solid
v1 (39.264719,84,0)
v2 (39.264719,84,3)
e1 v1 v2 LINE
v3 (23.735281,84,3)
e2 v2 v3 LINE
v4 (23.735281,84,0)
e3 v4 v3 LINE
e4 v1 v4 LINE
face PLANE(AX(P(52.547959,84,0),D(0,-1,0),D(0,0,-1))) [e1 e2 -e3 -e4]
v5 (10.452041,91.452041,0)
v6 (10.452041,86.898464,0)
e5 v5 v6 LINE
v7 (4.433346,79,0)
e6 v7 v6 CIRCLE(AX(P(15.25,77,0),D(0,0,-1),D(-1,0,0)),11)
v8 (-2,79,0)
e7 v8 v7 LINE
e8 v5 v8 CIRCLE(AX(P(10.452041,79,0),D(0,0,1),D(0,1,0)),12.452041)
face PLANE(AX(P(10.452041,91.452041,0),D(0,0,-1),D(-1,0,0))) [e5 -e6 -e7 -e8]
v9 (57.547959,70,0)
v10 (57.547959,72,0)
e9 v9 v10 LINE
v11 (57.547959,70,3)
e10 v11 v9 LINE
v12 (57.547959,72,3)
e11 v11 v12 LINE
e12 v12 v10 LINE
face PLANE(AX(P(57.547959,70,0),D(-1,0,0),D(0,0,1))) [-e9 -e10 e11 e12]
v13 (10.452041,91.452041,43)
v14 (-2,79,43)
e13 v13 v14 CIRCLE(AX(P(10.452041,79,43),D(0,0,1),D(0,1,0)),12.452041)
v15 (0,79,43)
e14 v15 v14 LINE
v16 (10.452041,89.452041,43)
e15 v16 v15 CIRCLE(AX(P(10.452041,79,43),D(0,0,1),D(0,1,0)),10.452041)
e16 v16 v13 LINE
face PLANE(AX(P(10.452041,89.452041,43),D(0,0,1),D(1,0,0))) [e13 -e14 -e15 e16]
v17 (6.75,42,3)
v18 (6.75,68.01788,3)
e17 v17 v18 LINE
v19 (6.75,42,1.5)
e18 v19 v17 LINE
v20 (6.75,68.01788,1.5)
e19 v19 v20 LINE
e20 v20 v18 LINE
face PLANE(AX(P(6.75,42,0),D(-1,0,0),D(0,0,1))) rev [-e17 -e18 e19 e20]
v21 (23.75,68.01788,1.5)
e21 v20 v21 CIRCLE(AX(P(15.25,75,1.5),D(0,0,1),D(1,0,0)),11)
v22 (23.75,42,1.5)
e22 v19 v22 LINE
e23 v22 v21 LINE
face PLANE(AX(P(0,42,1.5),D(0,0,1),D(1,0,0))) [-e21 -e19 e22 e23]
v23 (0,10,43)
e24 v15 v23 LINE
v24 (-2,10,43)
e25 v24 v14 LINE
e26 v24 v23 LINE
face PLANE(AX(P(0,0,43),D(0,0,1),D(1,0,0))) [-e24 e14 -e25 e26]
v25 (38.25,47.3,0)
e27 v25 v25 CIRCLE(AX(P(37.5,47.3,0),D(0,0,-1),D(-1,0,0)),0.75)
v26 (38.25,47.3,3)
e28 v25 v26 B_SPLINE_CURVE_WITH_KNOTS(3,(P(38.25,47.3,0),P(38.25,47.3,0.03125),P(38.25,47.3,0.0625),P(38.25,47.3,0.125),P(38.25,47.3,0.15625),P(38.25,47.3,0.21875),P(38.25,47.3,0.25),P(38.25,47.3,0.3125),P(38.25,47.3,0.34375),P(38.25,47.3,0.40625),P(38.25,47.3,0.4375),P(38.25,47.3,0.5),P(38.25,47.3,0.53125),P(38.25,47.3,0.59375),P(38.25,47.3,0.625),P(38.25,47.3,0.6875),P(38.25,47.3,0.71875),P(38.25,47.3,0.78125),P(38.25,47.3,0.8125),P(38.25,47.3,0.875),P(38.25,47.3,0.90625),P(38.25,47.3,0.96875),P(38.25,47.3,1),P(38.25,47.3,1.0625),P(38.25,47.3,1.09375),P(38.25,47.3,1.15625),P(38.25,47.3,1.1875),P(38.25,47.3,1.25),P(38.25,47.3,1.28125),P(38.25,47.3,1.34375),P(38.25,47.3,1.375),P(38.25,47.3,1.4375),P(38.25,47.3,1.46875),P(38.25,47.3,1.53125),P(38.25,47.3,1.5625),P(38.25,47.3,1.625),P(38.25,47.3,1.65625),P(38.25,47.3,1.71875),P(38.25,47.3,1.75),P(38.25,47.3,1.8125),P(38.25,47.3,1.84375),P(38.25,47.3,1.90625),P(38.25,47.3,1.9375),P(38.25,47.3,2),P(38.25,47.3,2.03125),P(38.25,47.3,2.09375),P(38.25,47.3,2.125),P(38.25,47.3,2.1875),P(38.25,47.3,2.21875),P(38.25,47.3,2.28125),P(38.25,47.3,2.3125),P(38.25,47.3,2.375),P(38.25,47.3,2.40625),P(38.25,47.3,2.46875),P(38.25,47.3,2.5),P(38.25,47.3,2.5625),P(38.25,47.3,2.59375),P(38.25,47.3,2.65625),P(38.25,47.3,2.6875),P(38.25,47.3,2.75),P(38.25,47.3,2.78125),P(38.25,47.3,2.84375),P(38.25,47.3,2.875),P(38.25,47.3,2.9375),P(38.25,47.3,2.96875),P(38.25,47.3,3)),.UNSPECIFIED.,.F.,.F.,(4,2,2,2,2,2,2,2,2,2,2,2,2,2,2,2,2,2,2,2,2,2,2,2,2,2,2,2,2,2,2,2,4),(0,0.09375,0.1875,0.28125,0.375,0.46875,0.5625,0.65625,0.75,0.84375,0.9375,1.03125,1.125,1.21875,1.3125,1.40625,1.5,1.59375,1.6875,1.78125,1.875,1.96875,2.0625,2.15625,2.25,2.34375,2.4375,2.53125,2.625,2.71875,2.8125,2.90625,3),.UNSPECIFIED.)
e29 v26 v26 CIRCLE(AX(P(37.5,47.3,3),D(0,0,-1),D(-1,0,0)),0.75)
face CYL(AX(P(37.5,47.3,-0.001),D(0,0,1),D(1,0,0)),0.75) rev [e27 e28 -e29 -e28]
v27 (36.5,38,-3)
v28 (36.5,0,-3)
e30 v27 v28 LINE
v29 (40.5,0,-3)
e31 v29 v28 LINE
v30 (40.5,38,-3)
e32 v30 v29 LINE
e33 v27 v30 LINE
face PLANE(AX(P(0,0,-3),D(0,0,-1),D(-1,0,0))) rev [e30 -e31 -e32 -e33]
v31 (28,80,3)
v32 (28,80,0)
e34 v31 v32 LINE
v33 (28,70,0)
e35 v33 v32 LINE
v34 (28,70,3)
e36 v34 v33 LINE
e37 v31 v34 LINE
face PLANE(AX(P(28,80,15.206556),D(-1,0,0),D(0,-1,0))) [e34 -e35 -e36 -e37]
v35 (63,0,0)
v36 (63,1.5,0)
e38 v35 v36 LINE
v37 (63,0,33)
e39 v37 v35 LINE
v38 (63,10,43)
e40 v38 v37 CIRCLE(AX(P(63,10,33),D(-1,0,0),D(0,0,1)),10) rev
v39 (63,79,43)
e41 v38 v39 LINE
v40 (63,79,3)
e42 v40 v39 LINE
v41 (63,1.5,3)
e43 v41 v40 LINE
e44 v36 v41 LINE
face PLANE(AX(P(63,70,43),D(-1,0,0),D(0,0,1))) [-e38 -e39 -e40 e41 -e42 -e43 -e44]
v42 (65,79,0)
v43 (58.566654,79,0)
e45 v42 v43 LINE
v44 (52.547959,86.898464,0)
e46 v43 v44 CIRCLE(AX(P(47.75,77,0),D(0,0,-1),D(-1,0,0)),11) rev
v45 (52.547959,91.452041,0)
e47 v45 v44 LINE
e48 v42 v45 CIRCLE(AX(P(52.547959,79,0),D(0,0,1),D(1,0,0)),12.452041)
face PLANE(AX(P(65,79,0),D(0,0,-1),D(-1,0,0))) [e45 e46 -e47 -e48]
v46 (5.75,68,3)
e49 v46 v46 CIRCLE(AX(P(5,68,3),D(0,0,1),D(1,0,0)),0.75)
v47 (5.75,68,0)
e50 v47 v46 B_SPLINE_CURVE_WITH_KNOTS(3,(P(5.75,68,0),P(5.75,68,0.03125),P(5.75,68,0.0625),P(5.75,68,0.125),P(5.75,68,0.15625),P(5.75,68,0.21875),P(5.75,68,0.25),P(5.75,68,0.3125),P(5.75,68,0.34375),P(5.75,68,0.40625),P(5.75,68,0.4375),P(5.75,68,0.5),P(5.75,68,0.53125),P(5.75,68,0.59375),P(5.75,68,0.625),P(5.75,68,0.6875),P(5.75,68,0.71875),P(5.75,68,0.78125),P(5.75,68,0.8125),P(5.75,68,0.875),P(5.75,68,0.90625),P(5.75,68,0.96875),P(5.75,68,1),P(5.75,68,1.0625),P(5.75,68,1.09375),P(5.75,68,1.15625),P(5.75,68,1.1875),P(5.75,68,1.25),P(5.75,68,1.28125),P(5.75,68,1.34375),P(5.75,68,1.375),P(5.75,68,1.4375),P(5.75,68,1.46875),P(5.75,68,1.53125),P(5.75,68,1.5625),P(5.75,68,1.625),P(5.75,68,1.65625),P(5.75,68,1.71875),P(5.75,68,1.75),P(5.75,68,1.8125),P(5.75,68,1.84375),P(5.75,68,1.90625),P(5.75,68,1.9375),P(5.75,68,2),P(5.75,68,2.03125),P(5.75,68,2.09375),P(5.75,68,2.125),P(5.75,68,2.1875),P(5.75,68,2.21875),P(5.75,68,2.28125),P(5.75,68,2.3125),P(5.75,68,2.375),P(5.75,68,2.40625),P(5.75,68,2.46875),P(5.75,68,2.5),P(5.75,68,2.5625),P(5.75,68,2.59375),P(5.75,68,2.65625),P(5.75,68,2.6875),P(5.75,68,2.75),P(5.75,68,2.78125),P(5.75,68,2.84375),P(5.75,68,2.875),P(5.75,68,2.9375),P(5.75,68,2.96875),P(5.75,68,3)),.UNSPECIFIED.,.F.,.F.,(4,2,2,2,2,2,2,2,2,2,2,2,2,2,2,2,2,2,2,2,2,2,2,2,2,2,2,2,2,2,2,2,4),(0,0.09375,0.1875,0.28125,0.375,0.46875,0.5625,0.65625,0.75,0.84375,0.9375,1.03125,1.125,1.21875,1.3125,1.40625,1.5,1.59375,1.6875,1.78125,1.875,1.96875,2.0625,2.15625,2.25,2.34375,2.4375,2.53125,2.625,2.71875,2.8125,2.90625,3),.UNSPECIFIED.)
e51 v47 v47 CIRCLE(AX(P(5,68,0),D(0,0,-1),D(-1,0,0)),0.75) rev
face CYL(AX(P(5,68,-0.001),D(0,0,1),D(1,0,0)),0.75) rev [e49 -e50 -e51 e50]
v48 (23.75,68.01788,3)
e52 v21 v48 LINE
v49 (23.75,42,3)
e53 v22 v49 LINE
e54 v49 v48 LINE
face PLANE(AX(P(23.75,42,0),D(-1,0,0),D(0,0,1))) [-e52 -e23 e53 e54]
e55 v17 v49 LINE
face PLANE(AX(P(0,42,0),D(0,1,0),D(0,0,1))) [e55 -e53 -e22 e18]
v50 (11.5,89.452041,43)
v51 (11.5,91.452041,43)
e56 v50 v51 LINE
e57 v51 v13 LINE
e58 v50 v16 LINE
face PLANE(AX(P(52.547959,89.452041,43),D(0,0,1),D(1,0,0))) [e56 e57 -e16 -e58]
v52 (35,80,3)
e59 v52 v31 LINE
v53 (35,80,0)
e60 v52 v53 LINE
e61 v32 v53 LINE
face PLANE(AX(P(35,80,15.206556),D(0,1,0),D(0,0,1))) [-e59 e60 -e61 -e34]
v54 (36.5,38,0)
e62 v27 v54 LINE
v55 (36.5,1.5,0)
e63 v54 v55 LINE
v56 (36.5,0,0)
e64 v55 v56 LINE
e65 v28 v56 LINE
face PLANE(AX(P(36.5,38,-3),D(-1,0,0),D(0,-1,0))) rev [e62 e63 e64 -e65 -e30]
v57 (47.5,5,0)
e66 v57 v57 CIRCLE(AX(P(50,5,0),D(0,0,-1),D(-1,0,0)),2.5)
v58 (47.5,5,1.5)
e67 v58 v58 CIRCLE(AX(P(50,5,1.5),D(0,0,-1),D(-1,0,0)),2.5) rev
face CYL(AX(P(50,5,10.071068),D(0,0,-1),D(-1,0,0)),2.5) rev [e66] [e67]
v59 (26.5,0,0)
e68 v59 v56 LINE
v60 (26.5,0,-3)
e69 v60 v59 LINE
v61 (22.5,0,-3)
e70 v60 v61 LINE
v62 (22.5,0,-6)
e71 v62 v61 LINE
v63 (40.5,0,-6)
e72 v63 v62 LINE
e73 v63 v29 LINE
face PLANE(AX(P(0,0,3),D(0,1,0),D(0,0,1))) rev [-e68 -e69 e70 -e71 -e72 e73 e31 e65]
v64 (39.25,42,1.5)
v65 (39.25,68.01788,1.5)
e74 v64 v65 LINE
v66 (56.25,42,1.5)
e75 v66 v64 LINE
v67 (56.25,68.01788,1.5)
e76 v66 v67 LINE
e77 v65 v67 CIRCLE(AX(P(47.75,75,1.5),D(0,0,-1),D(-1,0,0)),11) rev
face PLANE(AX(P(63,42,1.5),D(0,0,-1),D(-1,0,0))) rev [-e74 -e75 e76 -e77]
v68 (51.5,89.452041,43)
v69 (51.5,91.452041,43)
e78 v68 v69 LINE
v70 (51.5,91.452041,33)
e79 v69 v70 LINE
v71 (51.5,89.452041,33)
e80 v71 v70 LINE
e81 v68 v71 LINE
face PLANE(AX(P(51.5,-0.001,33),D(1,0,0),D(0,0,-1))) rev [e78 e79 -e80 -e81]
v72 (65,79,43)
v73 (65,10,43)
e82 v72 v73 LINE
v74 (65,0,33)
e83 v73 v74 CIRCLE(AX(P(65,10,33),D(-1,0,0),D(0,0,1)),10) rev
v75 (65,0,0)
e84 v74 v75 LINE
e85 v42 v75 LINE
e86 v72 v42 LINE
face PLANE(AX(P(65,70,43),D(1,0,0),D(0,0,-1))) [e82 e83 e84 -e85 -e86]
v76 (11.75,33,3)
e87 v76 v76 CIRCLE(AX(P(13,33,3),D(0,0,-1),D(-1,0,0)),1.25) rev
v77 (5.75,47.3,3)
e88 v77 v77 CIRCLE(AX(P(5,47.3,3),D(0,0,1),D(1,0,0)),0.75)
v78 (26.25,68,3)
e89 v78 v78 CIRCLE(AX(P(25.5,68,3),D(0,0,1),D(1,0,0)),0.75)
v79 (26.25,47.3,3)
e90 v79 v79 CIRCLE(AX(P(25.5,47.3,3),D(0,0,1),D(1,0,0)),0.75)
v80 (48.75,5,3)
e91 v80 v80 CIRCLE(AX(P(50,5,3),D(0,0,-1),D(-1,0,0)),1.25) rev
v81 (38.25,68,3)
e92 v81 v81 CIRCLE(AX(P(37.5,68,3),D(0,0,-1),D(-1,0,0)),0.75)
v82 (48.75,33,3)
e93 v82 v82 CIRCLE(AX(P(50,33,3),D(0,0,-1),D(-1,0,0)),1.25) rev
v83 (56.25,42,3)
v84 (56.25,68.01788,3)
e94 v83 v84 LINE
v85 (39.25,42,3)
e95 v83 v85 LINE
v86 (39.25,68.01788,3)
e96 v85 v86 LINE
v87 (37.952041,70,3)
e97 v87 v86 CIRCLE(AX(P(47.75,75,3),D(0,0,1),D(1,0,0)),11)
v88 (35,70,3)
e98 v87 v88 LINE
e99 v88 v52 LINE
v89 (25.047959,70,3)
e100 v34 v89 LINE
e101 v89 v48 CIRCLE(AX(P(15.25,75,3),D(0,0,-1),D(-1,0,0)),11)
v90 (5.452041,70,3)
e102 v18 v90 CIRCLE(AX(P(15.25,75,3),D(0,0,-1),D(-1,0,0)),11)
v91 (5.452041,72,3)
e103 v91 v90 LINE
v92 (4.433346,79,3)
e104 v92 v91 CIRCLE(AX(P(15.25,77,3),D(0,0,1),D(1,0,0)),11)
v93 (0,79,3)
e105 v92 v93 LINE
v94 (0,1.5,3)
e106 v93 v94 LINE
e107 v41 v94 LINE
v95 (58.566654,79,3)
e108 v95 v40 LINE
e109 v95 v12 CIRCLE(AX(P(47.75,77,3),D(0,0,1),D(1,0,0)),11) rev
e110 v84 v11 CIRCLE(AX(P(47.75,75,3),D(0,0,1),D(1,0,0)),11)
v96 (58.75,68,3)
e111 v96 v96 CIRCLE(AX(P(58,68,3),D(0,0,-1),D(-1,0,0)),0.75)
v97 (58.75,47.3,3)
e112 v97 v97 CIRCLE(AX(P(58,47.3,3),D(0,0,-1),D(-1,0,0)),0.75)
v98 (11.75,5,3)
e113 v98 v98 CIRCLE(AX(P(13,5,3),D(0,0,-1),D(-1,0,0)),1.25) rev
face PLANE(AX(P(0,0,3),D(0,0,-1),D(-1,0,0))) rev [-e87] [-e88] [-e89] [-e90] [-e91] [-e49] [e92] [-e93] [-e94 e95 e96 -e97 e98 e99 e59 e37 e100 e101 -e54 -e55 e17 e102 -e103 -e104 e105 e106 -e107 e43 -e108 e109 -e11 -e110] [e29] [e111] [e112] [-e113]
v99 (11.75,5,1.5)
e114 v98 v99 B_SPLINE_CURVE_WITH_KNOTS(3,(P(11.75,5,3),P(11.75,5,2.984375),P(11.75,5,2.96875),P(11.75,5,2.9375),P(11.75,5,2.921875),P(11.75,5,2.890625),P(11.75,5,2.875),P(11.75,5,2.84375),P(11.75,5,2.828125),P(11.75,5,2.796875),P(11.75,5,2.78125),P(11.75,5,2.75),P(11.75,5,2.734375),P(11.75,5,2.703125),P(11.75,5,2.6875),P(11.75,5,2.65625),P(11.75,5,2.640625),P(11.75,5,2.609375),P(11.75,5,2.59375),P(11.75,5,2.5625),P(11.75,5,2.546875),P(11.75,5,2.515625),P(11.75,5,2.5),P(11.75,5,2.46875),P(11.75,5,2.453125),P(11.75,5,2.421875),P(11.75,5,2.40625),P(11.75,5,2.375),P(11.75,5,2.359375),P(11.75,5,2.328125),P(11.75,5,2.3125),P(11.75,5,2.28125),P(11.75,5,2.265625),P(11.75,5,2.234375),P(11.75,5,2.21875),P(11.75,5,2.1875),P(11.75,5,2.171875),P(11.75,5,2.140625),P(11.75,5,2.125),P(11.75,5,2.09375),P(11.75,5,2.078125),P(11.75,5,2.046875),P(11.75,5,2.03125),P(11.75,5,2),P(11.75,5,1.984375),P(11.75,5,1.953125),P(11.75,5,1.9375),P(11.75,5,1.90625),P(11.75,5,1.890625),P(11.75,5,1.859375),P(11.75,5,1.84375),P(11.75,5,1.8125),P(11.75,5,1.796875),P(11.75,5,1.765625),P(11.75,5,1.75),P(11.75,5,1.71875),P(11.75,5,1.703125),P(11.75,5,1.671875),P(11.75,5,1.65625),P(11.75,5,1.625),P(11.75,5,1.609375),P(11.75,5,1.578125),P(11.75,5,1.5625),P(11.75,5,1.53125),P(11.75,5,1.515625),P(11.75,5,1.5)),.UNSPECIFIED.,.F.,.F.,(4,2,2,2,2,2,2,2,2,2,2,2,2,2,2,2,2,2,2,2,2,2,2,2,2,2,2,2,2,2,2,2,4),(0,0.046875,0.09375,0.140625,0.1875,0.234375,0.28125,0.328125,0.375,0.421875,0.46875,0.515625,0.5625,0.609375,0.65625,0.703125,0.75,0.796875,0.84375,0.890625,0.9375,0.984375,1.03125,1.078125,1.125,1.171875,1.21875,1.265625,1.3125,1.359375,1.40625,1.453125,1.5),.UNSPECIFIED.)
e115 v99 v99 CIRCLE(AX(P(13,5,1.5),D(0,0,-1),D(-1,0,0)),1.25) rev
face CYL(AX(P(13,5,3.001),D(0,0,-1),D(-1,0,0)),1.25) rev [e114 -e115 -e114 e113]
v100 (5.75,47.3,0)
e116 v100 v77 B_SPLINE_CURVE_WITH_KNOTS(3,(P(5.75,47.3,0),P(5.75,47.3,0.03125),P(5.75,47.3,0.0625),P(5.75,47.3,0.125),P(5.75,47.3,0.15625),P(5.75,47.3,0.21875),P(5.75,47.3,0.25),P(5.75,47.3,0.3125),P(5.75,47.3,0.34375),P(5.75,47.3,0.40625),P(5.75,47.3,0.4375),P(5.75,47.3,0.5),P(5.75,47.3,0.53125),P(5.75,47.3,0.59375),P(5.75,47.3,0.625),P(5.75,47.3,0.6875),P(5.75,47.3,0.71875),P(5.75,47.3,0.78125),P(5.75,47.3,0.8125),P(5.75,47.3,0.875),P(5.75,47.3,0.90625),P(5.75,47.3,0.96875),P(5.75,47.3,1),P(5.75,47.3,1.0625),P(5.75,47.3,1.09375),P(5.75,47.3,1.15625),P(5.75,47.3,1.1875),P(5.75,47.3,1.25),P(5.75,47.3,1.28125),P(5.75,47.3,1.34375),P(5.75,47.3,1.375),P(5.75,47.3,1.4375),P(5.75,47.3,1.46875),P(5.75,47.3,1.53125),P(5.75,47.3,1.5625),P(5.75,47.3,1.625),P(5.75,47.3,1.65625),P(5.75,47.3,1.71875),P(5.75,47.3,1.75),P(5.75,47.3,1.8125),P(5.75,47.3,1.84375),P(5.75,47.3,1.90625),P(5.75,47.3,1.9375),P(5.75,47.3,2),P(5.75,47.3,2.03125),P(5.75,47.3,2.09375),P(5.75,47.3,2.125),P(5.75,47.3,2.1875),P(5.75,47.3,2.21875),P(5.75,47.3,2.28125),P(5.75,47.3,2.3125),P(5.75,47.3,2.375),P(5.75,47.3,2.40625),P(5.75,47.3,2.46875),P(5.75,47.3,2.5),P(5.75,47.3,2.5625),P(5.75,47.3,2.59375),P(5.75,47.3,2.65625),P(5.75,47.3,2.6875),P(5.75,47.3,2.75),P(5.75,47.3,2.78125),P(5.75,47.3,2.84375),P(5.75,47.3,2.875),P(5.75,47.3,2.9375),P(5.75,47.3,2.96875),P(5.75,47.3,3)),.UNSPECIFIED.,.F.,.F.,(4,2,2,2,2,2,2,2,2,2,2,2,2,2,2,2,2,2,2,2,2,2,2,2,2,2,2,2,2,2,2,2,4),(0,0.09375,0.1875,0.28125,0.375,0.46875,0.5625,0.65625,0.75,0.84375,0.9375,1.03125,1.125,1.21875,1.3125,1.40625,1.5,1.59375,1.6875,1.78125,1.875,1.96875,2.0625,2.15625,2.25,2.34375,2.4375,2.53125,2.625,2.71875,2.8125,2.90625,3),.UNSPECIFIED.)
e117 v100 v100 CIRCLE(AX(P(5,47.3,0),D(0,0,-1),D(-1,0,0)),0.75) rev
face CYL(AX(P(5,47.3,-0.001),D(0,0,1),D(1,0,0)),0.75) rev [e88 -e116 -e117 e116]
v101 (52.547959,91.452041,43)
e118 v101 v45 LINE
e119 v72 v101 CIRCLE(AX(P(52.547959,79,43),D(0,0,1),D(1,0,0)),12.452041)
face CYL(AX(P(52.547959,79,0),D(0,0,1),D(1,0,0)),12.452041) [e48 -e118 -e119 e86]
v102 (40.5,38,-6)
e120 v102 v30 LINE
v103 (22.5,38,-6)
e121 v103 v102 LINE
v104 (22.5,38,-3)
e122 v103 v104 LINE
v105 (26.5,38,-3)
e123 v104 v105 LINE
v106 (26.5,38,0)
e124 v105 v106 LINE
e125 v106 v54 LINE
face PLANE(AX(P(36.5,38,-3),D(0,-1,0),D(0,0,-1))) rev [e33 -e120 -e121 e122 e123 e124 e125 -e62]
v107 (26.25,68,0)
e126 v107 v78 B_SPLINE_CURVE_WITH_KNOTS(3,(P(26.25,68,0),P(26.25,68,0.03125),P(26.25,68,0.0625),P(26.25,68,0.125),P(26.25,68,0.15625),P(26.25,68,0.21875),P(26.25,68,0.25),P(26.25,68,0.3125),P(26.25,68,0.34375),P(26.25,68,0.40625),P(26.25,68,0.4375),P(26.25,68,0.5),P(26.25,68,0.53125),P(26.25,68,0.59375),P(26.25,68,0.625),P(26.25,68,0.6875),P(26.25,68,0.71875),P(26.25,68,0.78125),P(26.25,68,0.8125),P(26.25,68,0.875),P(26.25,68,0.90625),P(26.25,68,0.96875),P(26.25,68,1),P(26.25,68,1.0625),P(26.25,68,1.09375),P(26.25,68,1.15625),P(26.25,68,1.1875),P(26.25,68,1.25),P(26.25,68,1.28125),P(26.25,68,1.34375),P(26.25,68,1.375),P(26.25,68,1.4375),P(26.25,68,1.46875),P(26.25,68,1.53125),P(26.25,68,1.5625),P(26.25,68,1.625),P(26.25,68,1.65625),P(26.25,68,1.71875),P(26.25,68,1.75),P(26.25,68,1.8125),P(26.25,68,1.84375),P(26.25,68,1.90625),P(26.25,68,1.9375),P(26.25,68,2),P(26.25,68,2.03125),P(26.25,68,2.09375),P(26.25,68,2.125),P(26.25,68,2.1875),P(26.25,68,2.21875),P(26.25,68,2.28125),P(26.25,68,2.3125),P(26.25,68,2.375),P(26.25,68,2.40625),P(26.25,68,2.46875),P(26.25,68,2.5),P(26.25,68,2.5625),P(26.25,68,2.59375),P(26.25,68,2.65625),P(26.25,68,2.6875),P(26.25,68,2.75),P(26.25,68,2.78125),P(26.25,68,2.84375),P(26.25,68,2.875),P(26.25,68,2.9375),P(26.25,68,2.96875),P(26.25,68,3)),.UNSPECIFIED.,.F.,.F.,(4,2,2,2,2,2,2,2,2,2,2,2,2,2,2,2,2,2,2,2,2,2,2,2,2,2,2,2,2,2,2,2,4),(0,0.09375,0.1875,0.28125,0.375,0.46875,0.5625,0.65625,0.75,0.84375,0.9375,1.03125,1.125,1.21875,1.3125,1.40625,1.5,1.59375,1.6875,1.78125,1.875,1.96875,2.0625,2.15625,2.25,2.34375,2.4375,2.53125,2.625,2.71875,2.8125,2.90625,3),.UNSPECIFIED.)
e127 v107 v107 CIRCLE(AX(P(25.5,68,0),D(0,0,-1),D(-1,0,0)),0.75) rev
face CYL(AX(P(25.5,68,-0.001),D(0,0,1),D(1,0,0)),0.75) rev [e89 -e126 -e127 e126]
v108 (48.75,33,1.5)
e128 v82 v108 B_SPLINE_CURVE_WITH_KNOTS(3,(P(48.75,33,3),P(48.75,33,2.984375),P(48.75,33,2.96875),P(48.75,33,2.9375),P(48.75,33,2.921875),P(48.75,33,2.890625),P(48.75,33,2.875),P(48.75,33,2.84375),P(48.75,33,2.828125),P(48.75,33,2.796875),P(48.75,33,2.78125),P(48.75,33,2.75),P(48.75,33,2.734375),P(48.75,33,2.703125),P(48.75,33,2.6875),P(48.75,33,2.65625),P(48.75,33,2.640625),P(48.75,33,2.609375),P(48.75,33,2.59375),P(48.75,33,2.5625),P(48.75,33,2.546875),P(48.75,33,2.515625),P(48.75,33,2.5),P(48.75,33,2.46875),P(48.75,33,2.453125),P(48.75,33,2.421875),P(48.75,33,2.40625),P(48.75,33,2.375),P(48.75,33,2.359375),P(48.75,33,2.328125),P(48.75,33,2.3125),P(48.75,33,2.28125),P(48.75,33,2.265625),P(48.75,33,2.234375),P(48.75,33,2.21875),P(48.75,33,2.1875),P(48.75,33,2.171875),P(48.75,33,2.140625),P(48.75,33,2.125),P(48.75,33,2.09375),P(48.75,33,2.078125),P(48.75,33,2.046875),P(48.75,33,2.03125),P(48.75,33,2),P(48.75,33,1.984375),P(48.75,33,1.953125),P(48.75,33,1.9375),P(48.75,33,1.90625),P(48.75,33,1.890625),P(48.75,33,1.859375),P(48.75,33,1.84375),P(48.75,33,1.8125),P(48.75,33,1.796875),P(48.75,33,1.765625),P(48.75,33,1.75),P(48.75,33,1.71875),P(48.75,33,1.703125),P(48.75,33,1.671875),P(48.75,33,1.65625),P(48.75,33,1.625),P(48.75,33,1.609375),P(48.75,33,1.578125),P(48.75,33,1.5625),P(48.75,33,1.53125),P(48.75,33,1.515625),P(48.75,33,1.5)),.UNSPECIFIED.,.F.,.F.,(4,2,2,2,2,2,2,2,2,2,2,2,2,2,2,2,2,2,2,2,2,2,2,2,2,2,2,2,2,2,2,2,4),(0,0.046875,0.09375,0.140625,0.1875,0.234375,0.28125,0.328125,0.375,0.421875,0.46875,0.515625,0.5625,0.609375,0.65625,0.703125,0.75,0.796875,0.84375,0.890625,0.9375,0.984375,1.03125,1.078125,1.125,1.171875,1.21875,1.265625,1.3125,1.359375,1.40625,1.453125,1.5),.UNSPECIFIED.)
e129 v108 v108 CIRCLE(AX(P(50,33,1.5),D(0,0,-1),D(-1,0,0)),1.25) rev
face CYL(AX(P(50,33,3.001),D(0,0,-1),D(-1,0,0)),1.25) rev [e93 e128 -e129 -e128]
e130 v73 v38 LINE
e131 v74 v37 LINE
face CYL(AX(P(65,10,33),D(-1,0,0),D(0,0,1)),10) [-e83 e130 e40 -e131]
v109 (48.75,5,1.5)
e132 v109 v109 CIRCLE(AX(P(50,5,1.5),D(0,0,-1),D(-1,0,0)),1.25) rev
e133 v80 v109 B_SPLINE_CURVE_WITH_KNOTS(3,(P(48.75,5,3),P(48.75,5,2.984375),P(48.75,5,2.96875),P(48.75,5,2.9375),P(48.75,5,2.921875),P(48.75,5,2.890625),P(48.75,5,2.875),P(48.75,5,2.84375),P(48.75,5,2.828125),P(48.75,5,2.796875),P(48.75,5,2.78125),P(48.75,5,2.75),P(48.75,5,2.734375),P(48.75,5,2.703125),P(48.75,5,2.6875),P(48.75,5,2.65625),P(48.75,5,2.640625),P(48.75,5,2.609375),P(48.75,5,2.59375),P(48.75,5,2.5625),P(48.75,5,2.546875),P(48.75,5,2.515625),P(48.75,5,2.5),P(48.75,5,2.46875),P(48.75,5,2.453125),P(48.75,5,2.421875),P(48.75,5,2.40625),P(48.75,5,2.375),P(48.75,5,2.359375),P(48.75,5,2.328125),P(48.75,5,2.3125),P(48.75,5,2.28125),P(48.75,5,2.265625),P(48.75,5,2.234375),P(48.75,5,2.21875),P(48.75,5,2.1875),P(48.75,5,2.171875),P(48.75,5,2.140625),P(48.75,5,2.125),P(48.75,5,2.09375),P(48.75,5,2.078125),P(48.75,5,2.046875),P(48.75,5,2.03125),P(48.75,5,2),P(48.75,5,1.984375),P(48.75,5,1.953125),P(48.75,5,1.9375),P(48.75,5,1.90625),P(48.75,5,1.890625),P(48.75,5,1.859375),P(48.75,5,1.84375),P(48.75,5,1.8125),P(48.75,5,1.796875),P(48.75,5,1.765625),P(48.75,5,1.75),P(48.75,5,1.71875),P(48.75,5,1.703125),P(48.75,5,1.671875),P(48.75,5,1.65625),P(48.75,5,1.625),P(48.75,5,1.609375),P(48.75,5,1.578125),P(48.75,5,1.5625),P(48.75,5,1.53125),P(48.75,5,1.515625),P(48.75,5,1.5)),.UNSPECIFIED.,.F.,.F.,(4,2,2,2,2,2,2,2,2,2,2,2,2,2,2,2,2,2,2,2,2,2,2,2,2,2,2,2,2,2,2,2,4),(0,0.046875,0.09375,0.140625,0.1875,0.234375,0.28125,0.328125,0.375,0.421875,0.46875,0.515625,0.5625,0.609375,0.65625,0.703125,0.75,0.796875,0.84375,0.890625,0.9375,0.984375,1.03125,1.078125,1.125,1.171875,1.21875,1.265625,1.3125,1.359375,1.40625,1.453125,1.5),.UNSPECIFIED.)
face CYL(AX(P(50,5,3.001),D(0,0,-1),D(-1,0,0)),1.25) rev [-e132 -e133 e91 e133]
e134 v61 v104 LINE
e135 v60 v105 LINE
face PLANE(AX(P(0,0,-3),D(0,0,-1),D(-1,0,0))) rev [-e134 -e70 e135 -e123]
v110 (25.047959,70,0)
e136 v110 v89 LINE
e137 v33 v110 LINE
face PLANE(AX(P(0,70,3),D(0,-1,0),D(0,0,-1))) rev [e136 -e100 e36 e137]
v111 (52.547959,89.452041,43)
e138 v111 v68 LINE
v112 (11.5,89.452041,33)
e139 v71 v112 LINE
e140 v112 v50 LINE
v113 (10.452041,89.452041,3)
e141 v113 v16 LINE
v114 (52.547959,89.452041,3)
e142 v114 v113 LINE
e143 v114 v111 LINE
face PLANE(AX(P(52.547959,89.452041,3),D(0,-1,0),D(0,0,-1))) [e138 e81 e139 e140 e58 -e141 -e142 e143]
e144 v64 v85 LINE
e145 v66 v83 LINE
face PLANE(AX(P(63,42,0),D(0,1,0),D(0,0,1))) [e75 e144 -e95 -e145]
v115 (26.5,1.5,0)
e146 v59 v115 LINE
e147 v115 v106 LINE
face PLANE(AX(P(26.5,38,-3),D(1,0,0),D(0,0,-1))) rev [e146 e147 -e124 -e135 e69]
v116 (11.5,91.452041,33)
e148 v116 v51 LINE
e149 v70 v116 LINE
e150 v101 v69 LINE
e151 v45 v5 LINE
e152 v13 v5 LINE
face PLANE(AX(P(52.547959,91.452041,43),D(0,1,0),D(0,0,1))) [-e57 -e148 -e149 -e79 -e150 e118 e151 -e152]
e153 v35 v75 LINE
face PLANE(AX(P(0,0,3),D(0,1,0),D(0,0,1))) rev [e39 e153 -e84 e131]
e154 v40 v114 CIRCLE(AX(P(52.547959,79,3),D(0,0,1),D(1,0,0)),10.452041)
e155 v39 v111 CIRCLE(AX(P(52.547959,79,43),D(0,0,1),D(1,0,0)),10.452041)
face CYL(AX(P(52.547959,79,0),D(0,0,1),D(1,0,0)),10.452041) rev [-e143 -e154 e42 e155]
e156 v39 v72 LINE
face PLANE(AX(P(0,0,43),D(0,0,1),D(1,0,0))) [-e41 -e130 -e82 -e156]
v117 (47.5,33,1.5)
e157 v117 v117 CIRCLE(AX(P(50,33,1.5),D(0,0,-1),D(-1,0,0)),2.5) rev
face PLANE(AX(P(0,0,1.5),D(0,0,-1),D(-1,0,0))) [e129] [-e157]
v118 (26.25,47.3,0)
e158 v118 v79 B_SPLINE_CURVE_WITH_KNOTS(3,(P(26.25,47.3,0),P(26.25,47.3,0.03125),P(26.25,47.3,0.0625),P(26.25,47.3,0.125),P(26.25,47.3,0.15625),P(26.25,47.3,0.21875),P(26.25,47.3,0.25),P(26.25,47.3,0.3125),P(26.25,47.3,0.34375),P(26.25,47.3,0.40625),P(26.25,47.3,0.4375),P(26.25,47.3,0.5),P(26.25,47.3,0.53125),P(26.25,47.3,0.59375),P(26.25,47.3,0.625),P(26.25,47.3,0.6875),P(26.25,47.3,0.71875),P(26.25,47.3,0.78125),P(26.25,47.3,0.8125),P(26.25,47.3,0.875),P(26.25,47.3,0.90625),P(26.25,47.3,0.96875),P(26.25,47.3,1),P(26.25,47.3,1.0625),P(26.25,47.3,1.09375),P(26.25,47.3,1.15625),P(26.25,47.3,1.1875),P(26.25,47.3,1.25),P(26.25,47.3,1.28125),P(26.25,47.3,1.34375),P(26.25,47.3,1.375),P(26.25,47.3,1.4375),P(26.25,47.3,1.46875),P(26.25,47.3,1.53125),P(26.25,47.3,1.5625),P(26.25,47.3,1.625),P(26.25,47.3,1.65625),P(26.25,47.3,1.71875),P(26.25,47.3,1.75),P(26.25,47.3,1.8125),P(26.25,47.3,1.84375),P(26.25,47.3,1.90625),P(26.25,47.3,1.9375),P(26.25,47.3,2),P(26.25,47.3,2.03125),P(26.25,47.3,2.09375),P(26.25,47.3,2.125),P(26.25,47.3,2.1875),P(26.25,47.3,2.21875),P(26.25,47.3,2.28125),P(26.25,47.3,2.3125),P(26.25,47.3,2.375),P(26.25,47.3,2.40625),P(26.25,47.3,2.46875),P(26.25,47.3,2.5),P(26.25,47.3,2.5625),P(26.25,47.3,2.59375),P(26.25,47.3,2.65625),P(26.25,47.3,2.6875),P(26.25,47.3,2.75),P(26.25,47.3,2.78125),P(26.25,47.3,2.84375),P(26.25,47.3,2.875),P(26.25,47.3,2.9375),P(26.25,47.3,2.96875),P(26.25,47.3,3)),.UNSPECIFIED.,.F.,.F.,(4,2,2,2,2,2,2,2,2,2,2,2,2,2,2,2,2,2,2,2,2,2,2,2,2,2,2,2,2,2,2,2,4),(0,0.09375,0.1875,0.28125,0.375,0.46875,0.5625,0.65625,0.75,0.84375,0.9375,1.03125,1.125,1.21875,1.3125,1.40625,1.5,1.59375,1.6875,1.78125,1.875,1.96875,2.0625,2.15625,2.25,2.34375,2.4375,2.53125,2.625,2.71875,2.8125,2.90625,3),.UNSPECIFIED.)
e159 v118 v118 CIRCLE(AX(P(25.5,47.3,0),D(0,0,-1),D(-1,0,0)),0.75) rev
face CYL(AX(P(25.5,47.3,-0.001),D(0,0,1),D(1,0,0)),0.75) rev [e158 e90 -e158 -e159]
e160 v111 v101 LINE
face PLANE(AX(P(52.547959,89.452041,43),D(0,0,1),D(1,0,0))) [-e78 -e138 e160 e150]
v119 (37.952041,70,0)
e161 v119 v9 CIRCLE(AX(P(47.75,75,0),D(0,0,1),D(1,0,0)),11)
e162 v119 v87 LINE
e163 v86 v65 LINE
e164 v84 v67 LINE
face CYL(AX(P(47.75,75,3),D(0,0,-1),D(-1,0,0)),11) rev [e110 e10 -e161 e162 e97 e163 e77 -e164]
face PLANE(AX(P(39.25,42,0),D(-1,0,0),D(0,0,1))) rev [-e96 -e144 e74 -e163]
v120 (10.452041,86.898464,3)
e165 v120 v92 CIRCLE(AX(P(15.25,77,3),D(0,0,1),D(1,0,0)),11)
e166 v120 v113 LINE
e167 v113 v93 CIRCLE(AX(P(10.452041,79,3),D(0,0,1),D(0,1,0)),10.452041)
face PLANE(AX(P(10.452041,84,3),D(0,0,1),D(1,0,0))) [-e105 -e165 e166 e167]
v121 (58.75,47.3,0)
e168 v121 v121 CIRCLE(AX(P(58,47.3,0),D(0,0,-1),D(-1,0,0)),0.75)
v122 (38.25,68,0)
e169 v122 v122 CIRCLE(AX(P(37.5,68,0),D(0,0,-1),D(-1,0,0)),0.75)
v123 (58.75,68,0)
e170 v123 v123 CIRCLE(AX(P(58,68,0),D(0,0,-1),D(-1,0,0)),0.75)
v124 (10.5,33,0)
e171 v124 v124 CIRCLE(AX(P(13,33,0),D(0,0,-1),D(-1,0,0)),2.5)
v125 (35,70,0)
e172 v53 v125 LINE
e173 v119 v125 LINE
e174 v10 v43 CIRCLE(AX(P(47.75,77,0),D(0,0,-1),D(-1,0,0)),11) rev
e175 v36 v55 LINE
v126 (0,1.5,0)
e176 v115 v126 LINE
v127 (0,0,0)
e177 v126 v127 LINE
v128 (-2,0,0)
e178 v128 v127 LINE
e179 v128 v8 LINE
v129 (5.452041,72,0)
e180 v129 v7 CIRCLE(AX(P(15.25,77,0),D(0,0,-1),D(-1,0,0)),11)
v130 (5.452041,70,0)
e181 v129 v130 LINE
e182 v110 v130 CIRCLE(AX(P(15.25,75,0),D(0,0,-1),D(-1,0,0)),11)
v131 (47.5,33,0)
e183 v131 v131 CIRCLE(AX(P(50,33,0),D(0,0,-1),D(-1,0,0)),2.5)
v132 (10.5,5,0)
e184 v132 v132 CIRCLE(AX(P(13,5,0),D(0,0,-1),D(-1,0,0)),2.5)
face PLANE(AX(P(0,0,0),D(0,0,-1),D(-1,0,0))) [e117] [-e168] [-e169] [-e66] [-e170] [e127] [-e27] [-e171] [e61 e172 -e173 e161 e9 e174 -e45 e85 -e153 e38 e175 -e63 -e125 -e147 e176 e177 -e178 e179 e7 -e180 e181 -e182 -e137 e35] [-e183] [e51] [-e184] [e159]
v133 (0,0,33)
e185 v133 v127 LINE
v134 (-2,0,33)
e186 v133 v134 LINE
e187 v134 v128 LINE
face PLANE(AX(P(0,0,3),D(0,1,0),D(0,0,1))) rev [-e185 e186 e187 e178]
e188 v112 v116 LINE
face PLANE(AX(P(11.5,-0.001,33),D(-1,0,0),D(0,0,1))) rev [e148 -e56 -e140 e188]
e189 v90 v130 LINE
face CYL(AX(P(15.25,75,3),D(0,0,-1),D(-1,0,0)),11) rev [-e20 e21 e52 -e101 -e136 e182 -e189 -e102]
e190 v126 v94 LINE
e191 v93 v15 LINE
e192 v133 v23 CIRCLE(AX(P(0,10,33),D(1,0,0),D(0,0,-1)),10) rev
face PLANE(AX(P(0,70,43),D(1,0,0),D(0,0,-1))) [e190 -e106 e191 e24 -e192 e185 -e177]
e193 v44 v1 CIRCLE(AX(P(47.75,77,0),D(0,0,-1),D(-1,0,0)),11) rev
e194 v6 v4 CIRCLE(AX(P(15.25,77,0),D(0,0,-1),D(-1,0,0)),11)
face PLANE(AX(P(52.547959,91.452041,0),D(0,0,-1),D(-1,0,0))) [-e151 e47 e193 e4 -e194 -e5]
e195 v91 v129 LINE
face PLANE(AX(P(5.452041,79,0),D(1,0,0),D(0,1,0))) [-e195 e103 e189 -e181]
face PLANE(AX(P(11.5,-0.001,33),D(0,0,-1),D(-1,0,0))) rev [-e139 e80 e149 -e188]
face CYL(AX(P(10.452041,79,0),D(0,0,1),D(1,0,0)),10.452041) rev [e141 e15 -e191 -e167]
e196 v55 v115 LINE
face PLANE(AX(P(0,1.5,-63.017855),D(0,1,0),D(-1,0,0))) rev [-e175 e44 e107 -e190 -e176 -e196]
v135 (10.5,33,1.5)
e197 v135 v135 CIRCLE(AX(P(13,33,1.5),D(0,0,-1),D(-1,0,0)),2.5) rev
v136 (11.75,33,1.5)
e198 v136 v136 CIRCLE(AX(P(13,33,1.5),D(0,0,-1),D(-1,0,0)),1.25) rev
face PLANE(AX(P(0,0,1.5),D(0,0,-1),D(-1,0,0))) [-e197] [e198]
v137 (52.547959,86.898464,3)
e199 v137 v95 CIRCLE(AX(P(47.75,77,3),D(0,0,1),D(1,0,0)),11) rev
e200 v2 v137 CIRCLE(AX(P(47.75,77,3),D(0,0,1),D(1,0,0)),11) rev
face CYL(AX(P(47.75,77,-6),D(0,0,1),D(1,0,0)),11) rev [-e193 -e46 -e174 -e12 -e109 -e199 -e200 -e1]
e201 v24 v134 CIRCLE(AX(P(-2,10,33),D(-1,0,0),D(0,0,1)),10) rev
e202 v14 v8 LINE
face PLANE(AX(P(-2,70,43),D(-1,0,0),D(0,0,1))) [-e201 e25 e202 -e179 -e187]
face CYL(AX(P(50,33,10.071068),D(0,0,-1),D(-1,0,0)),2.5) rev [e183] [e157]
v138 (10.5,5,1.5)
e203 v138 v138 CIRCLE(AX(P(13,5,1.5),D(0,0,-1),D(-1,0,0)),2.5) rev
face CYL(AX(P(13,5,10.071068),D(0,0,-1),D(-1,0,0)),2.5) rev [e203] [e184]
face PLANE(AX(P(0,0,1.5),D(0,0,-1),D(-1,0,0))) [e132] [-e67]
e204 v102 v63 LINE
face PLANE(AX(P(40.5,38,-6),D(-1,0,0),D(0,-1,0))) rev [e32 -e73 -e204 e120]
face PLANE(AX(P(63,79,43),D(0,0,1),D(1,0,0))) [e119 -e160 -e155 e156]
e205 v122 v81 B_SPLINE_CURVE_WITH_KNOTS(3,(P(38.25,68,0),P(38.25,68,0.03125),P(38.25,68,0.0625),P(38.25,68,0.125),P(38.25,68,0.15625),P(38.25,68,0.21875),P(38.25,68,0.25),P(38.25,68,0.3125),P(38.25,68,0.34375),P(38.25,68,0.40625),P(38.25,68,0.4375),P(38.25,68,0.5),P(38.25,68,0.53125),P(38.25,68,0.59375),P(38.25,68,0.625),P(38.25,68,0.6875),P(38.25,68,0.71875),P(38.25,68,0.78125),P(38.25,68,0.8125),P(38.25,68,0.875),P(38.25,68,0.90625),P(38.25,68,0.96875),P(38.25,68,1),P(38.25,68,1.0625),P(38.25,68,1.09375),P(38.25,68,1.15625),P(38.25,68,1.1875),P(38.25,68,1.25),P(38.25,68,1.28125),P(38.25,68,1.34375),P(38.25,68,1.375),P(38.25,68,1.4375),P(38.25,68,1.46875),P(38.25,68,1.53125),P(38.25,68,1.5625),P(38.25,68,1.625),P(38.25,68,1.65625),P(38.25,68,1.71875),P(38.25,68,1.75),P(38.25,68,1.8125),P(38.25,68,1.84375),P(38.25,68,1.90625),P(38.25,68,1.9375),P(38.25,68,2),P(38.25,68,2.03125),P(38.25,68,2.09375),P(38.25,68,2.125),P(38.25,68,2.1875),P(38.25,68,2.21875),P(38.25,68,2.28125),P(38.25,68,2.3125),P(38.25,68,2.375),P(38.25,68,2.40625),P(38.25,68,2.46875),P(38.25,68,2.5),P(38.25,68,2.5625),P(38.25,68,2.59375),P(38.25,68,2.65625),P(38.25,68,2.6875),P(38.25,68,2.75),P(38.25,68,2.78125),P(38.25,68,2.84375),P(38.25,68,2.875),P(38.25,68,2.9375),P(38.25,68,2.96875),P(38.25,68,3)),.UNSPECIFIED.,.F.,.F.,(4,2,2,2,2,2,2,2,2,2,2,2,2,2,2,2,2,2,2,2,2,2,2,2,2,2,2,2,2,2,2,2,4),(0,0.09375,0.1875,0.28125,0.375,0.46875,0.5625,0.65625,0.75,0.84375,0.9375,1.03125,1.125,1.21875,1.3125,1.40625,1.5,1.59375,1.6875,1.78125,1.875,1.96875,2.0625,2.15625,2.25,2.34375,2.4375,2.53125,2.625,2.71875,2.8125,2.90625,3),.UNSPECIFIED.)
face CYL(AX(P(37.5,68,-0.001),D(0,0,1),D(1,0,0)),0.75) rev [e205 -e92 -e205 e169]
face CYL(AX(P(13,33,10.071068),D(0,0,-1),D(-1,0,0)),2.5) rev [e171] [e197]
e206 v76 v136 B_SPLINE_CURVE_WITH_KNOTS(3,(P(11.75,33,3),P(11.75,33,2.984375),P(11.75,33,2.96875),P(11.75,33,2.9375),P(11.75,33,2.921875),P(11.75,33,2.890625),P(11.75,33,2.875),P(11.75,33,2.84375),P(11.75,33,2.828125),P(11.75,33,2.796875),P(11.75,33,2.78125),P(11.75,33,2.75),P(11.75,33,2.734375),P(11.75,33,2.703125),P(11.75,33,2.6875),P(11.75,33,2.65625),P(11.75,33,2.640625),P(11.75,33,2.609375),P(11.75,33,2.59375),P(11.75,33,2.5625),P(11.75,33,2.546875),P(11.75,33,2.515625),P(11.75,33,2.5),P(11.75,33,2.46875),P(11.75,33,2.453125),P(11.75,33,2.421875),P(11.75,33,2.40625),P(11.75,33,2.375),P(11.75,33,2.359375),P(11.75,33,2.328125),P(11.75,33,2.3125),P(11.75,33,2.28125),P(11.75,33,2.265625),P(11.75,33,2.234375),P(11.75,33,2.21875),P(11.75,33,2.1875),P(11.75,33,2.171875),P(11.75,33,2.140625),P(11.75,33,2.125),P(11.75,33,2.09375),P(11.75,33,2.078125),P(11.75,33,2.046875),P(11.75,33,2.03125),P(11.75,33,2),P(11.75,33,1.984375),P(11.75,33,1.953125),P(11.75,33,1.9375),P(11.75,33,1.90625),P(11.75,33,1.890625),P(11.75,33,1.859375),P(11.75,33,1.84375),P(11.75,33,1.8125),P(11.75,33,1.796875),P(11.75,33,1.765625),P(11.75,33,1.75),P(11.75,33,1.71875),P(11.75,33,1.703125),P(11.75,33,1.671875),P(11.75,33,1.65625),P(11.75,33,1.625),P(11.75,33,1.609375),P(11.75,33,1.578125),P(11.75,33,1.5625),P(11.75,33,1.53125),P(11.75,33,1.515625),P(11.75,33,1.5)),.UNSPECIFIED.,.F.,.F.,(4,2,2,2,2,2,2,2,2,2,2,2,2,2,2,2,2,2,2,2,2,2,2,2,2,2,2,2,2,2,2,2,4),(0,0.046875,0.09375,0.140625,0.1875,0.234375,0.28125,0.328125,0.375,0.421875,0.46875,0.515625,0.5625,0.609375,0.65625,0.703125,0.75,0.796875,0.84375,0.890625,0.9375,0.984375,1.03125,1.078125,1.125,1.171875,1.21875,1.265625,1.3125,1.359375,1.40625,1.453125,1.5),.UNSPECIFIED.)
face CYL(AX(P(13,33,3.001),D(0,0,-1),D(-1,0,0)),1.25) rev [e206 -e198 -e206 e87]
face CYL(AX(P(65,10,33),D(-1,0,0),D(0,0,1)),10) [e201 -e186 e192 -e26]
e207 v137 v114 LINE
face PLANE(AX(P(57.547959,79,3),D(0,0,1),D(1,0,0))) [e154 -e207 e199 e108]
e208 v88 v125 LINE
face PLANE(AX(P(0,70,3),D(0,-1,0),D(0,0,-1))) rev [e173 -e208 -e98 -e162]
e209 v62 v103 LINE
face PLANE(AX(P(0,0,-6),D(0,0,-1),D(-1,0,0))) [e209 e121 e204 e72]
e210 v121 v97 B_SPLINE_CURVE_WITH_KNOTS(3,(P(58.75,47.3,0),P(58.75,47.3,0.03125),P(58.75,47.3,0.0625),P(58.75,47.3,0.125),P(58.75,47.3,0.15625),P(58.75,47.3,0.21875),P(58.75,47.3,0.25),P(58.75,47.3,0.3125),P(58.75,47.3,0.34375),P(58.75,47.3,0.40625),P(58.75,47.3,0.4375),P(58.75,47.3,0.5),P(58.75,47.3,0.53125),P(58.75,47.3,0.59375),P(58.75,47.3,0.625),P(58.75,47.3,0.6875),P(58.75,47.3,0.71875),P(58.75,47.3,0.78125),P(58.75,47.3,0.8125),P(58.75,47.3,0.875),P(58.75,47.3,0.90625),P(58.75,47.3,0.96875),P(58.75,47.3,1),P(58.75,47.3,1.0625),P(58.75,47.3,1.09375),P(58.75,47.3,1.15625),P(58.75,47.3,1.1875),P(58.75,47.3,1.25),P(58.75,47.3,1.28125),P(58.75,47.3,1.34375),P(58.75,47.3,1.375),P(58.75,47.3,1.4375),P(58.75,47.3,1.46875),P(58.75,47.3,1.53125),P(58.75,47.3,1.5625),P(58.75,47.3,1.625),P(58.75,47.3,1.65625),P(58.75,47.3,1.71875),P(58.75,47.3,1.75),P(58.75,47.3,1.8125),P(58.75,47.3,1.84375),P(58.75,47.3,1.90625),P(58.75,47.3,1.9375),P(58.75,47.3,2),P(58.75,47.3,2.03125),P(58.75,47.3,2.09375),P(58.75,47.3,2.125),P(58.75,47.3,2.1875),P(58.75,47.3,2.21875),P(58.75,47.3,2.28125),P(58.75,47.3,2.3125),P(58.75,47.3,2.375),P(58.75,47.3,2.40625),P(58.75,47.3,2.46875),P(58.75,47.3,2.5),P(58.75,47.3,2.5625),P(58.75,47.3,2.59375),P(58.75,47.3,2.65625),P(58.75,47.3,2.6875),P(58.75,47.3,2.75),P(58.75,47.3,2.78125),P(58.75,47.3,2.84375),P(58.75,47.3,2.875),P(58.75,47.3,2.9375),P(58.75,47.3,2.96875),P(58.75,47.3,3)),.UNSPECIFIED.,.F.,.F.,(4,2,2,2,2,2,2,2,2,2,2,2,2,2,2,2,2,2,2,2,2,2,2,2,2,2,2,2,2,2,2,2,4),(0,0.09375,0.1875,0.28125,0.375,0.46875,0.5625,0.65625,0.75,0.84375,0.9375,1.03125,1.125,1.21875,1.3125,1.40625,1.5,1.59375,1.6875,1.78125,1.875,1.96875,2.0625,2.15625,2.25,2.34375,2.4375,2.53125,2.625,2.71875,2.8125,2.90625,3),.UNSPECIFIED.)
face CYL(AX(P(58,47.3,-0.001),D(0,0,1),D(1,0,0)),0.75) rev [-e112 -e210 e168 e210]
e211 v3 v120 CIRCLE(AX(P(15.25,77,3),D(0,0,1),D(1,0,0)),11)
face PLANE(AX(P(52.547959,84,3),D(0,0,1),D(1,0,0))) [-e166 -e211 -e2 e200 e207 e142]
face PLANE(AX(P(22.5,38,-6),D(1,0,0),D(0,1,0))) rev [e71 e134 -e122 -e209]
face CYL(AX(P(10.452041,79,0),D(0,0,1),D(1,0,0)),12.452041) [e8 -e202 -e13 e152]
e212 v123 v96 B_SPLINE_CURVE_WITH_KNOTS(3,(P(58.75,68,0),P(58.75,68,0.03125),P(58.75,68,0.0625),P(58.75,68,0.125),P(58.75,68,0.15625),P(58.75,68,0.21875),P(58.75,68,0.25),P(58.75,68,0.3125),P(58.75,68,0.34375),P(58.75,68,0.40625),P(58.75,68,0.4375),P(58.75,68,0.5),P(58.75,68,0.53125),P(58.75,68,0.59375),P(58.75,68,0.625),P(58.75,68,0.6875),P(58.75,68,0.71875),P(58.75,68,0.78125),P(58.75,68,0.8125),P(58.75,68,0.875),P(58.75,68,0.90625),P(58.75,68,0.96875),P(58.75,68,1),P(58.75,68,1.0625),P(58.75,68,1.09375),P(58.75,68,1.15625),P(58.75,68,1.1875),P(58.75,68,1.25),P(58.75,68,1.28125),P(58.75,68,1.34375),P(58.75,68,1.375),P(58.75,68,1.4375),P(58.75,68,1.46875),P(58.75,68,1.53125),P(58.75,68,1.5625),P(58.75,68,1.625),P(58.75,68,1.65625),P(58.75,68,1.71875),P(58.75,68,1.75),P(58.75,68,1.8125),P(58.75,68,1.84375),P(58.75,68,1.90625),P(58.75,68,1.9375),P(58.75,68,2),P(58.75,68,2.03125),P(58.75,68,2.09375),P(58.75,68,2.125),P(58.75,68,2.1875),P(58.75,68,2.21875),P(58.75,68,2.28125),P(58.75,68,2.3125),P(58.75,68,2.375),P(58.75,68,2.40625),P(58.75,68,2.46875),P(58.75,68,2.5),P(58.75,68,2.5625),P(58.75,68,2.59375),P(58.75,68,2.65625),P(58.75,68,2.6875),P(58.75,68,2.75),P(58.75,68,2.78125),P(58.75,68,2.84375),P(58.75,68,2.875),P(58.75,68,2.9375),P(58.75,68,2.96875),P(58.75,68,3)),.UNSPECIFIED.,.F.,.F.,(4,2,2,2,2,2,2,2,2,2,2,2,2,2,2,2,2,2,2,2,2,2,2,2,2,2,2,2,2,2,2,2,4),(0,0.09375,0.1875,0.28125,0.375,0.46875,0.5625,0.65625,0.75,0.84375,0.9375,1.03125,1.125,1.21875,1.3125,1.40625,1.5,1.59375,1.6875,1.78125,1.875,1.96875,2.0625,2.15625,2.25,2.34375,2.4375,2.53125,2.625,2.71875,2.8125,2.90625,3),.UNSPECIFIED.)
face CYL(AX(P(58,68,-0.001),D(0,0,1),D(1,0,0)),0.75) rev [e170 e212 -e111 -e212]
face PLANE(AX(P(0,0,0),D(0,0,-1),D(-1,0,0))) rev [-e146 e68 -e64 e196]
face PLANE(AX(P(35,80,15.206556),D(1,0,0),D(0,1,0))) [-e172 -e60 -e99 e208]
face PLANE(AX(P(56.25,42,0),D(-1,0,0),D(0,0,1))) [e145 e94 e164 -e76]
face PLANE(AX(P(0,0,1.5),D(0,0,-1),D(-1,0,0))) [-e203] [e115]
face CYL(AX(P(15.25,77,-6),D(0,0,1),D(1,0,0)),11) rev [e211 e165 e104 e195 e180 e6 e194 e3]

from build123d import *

# Parameters (mm, degrees)
SKETCH_1_W           = 63
SKETCH_1_H           = 70
EXTRUDE_1_DEPTH      = 3
CUT_EXTRUDE_1_REACH  = 96.223
SKETCH_2_R           = 0.75
SKETCH_3_W           = 17
SKETCH_3_H           = 1.5
CUT_EXTRUDE_2_DEPTH  = 28
SKETCH_4_R           = 11
CUT_EXTRUDE_3_DEPTH  = 95.223139409
CUT_EXTRUDE_5_REACH  = 96.223
SKETCH_6_R           = 1.25
SKETCH_7_R           = 2.5
CUT_EXTRUDE_6_DEPTH  = 1.5
SKETCH_9_W           = 7
SKETCH_9_H           = 10
EXTRUDE_2_DEPTH      = 3
SKETCH_10_W          = 10
SKETCH_10_H          = 38
EXTRUDE_3_DEPTH      = 3
SKETCH_11_W          = 18
SKETCH_11_H          = 38
EXTRUDE_4_DEPTH      = 3
SKETCH_12_W          = 2
SKETCH_12_H          = 70
EXTRUDE_5_DEPTH      = 43
SWEEP_1_DEPTH        = 43
SWEEP_1_2_DEPTH      = 3
CUT_EXTRUDE_7_DEPTH  = 122.249642508
SKETCH_16_R          = 11
CUT_EXTRUDE_9_DEPTH  = 120.11538863
SKETCH_21_W          = 63
SKETCH_21_H          = 1.5
CUT_EXTRUDE_10_DEPTH = 3
CUT_EXTRUDE_11_REACH = 122.156
SKETCH_23_W          = 40
SKETCH_23_H          = 10


# Read off the part's stored shape, not the designer's step: 扫描1
with BuildPart() as part:
    # 草图1 → 凸台-拉伸1 (new body)
    with BuildSketch(Plane.XY):
        with Locations((31.5, 35)):
            Rectangle(SKETCH_1_W, SKETCH_1_H)
    extrude(amount=EXTRUDE_1_DEPTH)

    # 草图2 → 切除-拉伸1 (cut, up to next)
    with BuildSketch(Plane.XY.offset(3), mode=Mode.PRIVATE) as cut_extrude_1_sk1:
        with Locations((5, 68)):
            Circle(SKETCH_2_R)
    cut_extrude_1_tool1 = extrude(cut_extrude_1_sk1.sketch, amount=-CUT_EXTRUDE_1_REACH, mode=Mode.PRIVATE) & part.part
    # 草图2 → 切除-拉伸1 (cut, up to next)
    with BuildSketch(Plane.XY.offset(3), mode=Mode.PRIVATE) as cut_extrude_1_sk2:
        with Locations((5, 47.3)):
            Circle(SKETCH_2_R)
    cut_extrude_1_tool2 = extrude(cut_extrude_1_sk2.sketch, amount=-CUT_EXTRUDE_1_REACH, mode=Mode.PRIVATE) & part.part
    # 草图2 → 切除-拉伸1 (cut, up to next)
    with BuildSketch(Plane.XY.offset(3), mode=Mode.PRIVATE) as cut_extrude_1_sk3:
        with Locations((25.5, 47.3)):
            Circle(SKETCH_2_R)
    cut_extrude_1_tool3 = extrude(cut_extrude_1_sk3.sketch, amount=-CUT_EXTRUDE_1_REACH, mode=Mode.PRIVATE) & part.part
    # 草图2 → 切除-拉伸1 (cut, up to next)
    with BuildSketch(Plane.XY.offset(3), mode=Mode.PRIVATE) as cut_extrude_1_sk4:
        with Locations((25.5, 68)):
            Circle(SKETCH_2_R)
    cut_extrude_1_tool4 = extrude(cut_extrude_1_sk4.sketch, amount=-CUT_EXTRUDE_1_REACH, mode=Mode.PRIVATE) & part.part
    cut_extrude_1_1 = cut_extrude_1_tool1.solids().sort_by_distance((5, 68, 3))[0]
    add(cut_extrude_1_1, mode=Mode.SUBTRACT)
    cut_extrude_1_2 = cut_extrude_1_tool2.solids().sort_by_distance((5, 47.3, 3))[0]
    add(cut_extrude_1_2, mode=Mode.SUBTRACT)
    cut_extrude_1_3 = cut_extrude_1_tool3.solids().sort_by_distance((25.5, 47.3, 3))[0]
    add(cut_extrude_1_3, mode=Mode.SUBTRACT)
    cut_extrude_1_4 = cut_extrude_1_tool4.solids().sort_by_distance((25.5, 68, 3))[0]
    add(cut_extrude_1_4, mode=Mode.SUBTRACT)
    cut_extrude_1 = cut_extrude_1_1 + cut_extrude_1_2 + cut_extrude_1_3 + cut_extrude_1_4  # 切除-拉伸1 as one shape, for the pattern or mirror that repeats it

    # 草图3 → 切除-拉伸2 (cut)
    with BuildSketch(Plane(origin=(0, 70, 0), x_dir=(1, 0, 0), z_dir=(0, 1, 0))):
        with Locations((15.25, -2.25)):
            Rectangle(SKETCH_3_W, SKETCH_3_H)
    cut_extrude_2 = extrude(amount=-CUT_EXTRUDE_2_DEPTH, mode=Mode.SUBTRACT)

    # 草图4 → 切除-拉伸3 (cut, through all)
    with BuildSketch(Plane(origin=(0, 0, 0), x_dir=(-1, 0, 0), z_dir=(0, 0, -1))):
        with Locations((-15.25, 75)):
            Circle(SKETCH_4_R)
    cut_extrude_3 = extrude(amount=-CUT_EXTRUDE_3_DEPTH, mode=Mode.SUBTRACT)

    # 镜向1: 切除-拉伸1, 切除-拉伸2, 切除-拉伸3 across plane
    add(cut_extrude_1.mirror(Plane.ZY.offset(-31.5)), mode=Mode.SUBTRACT)
    add(cut_extrude_2.mirror(Plane.ZY.offset(-31.5)), mode=Mode.SUBTRACT)
    add(cut_extrude_3.mirror(Plane.ZY.offset(-31.5)), mode=Mode.SUBTRACT)

    # 草图6 → 切除-拉伸5 (cut, up to next)
    with BuildSketch(Plane(origin=(0, 0, 0), x_dir=(-1, 0, 0), z_dir=(0, 0, -1)), mode=Mode.PRIVATE) as cut_extrude_5_sk1:
        with Locations((-50, 5)):
            Circle(SKETCH_6_R)
    cut_extrude_5_tool1 = extrude(cut_extrude_5_sk1.sketch, amount=-CUT_EXTRUDE_5_REACH, mode=Mode.PRIVATE) & part.part
    # 草图6 → 切除-拉伸5 (cut, up to next)
    with BuildSketch(Plane(origin=(0, 0, 0), x_dir=(-1, 0, 0), z_dir=(0, 0, -1)), mode=Mode.PRIVATE) as cut_extrude_5_sk2:
        with Locations((-50, 33)):
            Circle(SKETCH_6_R)
    cut_extrude_5_tool2 = extrude(cut_extrude_5_sk2.sketch, amount=-CUT_EXTRUDE_5_REACH, mode=Mode.PRIVATE) & part.part
    # 草图6 → 切除-拉伸5 (cut, up to next)
    with BuildSketch(Plane(origin=(0, 0, 0), x_dir=(-1, 0, 0), z_dir=(0, 0, -1)), mode=Mode.PRIVATE) as cut_extrude_5_sk3:
        with Locations((-13, 33)):
            Circle(SKETCH_6_R)
    cut_extrude_5_tool3 = extrude(cut_extrude_5_sk3.sketch, amount=-CUT_EXTRUDE_5_REACH, mode=Mode.PRIVATE) & part.part
    # 草图6 → 切除-拉伸5 (cut, up to next)
    with BuildSketch(Plane(origin=(0, 0, 0), x_dir=(-1, 0, 0), z_dir=(0, 0, -1)), mode=Mode.PRIVATE) as cut_extrude_5_sk4:
        with Locations((-13, 5)):
            Circle(SKETCH_6_R)
    cut_extrude_5_tool4 = extrude(cut_extrude_5_sk4.sketch, amount=-CUT_EXTRUDE_5_REACH, mode=Mode.PRIVATE) & part.part
    add(cut_extrude_5_tool1.solids().sort_by_distance((50, 5, 0))[0], mode=Mode.SUBTRACT)
    add(cut_extrude_5_tool2.solids().sort_by_distance((50, 33, 0))[0], mode=Mode.SUBTRACT)
    add(cut_extrude_5_tool3.solids().sort_by_distance((13, 33, 0))[0], mode=Mode.SUBTRACT)
    add(cut_extrude_5_tool4.solids().sort_by_distance((13, 5, 0))[0], mode=Mode.SUBTRACT)

    # 草图7 → 切除-拉伸6 (cut)
    with BuildSketch(Plane(origin=(0, 0, 0), x_dir=(-1, 0, 0), z_dir=(0, 0, -1))):
        with Locations((-50, 33)):
            Circle(SKETCH_7_R)
        with Locations((-13, 33)):
            Circle(SKETCH_7_R)
        with Locations((-13, 5)):
            Circle(SKETCH_7_R)
        with Locations((-50, 5)):
            Circle(SKETCH_7_R)
    extrude(amount=-CUT_EXTRUDE_6_DEPTH, mode=Mode.SUBTRACT)

    # 草图9 → 凸台-拉伸2 (add)
    with BuildSketch(Plane(origin=(0, 0, 0), x_dir=(-1, 0, 0), z_dir=(0, 0, -1))):
        with Locations((-31.5, 75)):
            Rectangle(SKETCH_9_W, SKETCH_9_H)
    extrude(amount=-EXTRUDE_2_DEPTH)

    # 草图10 → 凸台-拉伸3 (add)
    with BuildSketch(Plane(origin=(0, 0, 0), x_dir=(-1, 0, 0), z_dir=(0, 0, -1))):
        with Locations((-31.5, 19)):
            Rectangle(SKETCH_10_W, SKETCH_10_H)
    extrude(amount=EXTRUDE_3_DEPTH)

    # 草图11 → 凸台-拉伸4 (add)
    with BuildSketch(Plane(origin=(0, 0, -3), x_dir=(-1, 0, 0), z_dir=(0, 0, -1))):
        with Locations((-31.5, 19)):
            Rectangle(SKETCH_11_W, SKETCH_11_H)
    extrude(amount=EXTRUDE_4_DEPTH)

    # 草图12 → 凸台-拉伸5 (add)
    with BuildSketch(Plane(origin=(0, 0, 0), x_dir=(-1, 0, 0), z_dir=(0, 0, -1))):
        with Locations((-64, 35)):
            Rectangle(SKETCH_12_W, SKETCH_12_H)
        with Locations((1, 35)):
            Rectangle(SKETCH_12_W, SKETCH_12_H)
    extrude(amount=-EXTRUDE_5_DEPTH)

    # 扫描1 outline → 扫描1 (add)
    with BuildSketch(Plane.XY):
        with BuildLine():
            ThreePointArc((52.547958971, 89.452041029), (59.93866806, 86.390709089), (63, 79))
            Line((63, 79), (63, 70))
            Line((63, 70), (65, 70))
            Line((65, 70), (65, 79))
            ThreePointArc((65, 79), (61.352881622, 87.804922651), (52.547958971, 91.452041029))
            Line((52.547958971, 91.452041029), (10.452041029, 91.452041029))
            ThreePointArc((10.452041029, 91.452041029), (1.647118378, 87.804922651), (-2, 79))
            Line((-2, 79), (-2, 70))
            Line((-2, 70), (0, 70))
            Line((0, 70), (0, 79))
            ThreePointArc((0, 79), (3.06133194, 86.390709089), (10.452041029, 89.452041029))
            Line((10.452041029, 89.452041029), (52.547958971, 89.452041029))
        make_face()
    extrude(amount=SWEEP_1_DEPTH)

    # Sweep 1 2 outline → Sweep 1 2 (add)
    with BuildSketch(Plane.XY):
        with BuildLine():
            Line((63, 70), (63, 79))
            ThreePointArc((63, 79), (59.93866806, 86.390709089), (52.547958971, 89.452041029))
            Line((52.547958971, 89.452041029), (10.452041029, 89.452041029))
            ThreePointArc((10.452041029, 89.452041029), (3.06133194, 86.390709089), (0, 79))
            Line((0, 79), (0, 70))
            Line((0, 70), (5.452041029, 70))
            Line((5.452041029, 70), (5.452041029, 79))
            ThreePointArc((5.452041029, 79), (6.916507123, 82.535533906), (10.452041029, 84))
            Line((10.452041029, 84), (52.547958971, 84))
            ThreePointArc((52.547958971, 84), (56.083492877, 82.535533906), (57.547958971, 79))
            Line((57.547958971, 79), (57.547958971, 70))
            Line((57.547958971, 70), (63, 70))
        make_face()
    extrude(amount=SWEEP_1_2_DEPTH)

    # 草图15 → 切除-拉伸7 (cut, through all)
    with BuildSketch(Plane.ZY.offset(2)):
        with BuildLine():
            ThreePointArc((43, 10), (40.071067812, 2.928932188), (33, 0))
            Line((33, 0), (43, 0))
            Line((43, 0), (43, 10))
        make_face()
    extrude(amount=-CUT_EXTRUDE_7_DEPTH, mode=Mode.SUBTRACT)

    # 草图16 → 切除-拉伸9 (cut, through all)
    with BuildSketch(Plane.XY.offset(3)):
        with Locations((15.25, 77)):
            Circle(SKETCH_16_R)
        with Locations((47.75, 77)):
            Circle(SKETCH_16_R)
    extrude(amount=-CUT_EXTRUDE_9_DEPTH, mode=Mode.SUBTRACT)

    # 草图21 → 切除-拉伸10 (cut)
    with BuildSketch(Plane.XY.offset(3)):
        with Locations((31.5, 0.75)):
            Rectangle(SKETCH_21_W, SKETCH_21_H)
    extrude(amount=-CUT_EXTRUDE_10_DEPTH, mode=Mode.SUBTRACT)

    # 草图23 → 切除-拉伸11 (cut, up to next)
    with BuildSketch(Plane(origin=(0, 91.452041029, 0), x_dir=(1, 0, 0), z_dir=(0, 1, 0)), mode=Mode.PRIVATE) as cut_extrude_11_sk1:
        with Locations((31.5, -38)):
            Rectangle(SKETCH_23_W, SKETCH_23_H)
    cut_extrude_11_tool1 = extrude(cut_extrude_11_sk1.sketch, amount=-CUT_EXTRUDE_11_REACH, mode=Mode.PRIVATE) & part.part
    add(cut_extrude_11_tool1.solids().sort_by_distance((31.5, 91.452041, 38))[0], mode=Mode.SUBTRACT)


solid = part.part
